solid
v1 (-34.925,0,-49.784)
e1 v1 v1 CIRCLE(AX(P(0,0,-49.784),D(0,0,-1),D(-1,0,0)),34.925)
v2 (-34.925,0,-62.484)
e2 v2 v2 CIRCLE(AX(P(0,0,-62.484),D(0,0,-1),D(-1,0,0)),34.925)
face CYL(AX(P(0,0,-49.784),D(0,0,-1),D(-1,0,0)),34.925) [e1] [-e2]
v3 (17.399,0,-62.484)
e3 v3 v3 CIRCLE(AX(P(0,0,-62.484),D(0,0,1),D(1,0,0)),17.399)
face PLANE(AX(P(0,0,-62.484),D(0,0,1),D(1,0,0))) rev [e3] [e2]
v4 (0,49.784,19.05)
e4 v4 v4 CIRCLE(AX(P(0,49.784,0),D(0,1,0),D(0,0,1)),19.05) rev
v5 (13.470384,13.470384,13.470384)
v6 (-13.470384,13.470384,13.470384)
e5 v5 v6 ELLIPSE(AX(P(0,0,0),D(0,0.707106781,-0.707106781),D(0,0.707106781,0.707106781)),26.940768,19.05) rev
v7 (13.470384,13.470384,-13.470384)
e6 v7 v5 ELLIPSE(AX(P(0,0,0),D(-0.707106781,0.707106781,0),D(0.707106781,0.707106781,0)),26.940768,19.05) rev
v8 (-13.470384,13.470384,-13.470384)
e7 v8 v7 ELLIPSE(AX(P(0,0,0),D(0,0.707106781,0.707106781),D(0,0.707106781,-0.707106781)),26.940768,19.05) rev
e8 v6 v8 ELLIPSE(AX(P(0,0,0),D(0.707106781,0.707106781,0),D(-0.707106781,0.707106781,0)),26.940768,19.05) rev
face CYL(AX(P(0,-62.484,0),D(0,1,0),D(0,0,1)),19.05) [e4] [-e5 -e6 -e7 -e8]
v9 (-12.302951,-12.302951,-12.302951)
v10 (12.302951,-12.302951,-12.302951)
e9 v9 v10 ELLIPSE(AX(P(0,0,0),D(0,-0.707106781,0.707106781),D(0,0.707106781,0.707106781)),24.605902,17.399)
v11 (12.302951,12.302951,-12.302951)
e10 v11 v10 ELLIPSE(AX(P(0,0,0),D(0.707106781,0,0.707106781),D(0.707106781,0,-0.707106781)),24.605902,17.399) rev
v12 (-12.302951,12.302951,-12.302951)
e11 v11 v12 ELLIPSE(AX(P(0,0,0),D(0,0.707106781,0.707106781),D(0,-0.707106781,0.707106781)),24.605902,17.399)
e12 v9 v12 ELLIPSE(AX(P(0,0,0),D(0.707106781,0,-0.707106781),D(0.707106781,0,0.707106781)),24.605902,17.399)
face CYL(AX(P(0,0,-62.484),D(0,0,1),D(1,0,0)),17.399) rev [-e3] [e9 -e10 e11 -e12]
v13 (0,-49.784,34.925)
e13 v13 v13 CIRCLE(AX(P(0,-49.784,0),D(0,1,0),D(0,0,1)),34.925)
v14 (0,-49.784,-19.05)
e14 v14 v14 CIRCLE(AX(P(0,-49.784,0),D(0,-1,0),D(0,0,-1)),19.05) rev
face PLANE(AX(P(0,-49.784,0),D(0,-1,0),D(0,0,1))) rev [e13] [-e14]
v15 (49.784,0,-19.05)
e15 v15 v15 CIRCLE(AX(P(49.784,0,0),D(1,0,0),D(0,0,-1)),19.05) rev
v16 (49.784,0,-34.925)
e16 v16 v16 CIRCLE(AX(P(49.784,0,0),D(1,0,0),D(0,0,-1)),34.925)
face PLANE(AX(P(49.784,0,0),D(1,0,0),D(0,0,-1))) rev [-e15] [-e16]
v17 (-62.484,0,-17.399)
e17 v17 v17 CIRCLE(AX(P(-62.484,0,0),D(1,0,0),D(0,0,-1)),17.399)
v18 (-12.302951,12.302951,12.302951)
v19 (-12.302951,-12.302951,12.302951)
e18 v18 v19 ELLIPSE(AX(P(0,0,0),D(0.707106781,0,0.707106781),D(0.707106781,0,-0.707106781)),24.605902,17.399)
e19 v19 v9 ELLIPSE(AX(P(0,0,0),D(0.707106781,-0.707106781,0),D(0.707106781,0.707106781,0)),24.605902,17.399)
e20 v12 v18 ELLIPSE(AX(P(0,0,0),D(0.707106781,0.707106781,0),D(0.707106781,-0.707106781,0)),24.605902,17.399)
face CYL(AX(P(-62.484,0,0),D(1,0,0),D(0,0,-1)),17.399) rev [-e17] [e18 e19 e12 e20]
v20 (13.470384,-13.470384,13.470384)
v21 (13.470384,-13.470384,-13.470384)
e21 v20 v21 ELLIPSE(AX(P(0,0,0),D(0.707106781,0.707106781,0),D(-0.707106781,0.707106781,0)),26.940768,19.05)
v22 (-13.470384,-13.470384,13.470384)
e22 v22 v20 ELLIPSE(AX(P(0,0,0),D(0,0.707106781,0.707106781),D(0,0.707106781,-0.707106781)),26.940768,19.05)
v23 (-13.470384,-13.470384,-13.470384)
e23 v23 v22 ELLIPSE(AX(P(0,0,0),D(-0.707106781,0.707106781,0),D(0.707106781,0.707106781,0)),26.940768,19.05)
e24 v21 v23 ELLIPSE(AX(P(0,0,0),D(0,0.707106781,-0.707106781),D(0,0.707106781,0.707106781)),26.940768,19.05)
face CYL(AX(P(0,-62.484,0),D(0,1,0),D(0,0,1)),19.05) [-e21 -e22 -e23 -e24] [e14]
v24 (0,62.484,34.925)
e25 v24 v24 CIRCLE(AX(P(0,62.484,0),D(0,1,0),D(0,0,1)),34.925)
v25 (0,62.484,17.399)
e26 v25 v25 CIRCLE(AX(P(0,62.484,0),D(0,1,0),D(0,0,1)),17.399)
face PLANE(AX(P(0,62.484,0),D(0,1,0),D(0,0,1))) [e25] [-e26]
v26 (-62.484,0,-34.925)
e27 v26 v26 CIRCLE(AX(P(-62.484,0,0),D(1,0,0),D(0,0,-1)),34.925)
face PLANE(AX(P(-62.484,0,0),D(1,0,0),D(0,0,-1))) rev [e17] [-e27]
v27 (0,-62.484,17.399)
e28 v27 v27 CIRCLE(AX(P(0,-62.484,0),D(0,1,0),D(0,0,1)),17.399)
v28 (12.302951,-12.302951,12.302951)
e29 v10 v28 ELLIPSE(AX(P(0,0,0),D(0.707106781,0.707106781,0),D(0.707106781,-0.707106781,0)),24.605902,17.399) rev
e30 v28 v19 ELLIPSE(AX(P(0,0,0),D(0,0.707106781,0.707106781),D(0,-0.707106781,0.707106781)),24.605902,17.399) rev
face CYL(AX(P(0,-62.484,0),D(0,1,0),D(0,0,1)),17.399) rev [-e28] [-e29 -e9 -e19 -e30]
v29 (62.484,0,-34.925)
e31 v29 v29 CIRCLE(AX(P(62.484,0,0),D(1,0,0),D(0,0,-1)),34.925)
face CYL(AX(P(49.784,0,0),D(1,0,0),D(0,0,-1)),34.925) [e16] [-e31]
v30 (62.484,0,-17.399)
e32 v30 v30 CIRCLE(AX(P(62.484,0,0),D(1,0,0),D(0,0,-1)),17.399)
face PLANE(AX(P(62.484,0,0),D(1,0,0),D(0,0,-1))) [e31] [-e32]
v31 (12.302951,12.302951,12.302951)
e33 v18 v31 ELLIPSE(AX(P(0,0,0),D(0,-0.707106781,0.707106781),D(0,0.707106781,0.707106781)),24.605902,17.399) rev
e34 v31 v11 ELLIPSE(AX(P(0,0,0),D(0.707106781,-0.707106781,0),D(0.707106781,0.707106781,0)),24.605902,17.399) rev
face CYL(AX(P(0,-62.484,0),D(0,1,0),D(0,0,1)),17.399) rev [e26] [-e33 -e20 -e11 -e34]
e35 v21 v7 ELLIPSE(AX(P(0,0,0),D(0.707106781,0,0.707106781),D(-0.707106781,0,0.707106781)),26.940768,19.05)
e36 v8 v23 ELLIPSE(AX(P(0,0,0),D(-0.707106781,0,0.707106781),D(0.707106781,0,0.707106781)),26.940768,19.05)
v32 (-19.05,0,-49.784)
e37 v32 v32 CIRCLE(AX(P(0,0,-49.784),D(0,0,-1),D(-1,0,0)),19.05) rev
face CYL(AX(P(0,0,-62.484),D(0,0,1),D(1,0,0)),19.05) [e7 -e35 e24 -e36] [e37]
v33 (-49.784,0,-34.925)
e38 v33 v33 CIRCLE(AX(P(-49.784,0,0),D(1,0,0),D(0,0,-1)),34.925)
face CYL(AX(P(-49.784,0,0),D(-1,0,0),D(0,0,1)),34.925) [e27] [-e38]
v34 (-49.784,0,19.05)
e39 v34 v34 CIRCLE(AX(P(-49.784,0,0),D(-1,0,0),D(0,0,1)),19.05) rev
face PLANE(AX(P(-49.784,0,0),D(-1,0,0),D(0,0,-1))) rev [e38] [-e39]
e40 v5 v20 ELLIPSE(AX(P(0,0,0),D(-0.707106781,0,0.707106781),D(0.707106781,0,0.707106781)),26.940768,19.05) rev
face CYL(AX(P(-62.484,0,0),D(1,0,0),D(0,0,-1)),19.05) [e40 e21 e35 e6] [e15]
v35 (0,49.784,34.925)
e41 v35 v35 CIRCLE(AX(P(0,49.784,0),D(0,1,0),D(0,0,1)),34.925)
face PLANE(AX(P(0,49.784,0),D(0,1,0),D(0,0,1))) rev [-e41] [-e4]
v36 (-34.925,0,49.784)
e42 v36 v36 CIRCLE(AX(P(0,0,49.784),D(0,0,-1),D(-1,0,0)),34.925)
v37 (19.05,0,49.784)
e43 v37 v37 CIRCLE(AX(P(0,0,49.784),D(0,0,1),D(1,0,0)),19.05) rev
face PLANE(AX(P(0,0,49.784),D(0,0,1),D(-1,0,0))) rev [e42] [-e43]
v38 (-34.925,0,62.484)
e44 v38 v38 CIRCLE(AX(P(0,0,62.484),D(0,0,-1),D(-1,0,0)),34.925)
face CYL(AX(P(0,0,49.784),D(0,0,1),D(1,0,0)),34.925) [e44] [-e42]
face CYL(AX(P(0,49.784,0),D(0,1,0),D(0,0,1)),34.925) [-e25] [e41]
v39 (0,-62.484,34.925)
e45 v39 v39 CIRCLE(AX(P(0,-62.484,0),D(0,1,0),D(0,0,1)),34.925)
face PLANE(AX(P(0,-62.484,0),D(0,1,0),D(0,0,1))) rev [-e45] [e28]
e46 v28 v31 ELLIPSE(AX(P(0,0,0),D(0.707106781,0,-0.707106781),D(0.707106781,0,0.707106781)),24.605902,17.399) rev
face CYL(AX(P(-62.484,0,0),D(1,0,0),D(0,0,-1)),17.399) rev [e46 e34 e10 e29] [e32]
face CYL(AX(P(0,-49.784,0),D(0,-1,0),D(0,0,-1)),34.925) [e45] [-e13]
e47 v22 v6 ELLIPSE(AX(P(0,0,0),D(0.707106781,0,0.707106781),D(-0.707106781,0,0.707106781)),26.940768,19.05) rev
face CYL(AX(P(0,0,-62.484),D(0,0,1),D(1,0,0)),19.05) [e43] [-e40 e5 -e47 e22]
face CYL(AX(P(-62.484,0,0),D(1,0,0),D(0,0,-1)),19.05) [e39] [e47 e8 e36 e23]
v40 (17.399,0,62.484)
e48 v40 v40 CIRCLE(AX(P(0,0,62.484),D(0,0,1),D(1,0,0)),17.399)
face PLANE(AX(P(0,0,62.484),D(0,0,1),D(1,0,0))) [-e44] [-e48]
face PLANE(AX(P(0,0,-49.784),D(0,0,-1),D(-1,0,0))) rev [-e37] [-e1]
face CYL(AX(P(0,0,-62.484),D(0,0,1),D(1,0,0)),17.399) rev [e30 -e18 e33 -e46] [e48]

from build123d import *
from build123d.topology import SkipClean

# Parameters (mm, degrees)
EXTRUDE1_DEPTH      = 62.484
EXTRUDE1_DEPTH_BACK = 62.484
SKETCH1_R           = 19.05
SKETCH1_R_2         = 17.399
EXTRUDE2_DEPTH      = 62.484
EXTRUDE2_DEPTH_BACK = 62.484
SKETCH2_R           = 19.05
SKETCH2_R_2         = 17.399
EXTRUDE3_DEPTH      = 62.484
EXTRUDE3_DEPTH_BACK = 62.484
SKETCH3_R           = 19.05
SKETCH3_R_2         = 17.399
EXTRUDE4_START      = -81.534000101
EXTRUDE4_OUTLINE_R  = 17.399
EXTRUDE4_DEPTH      = 38.100000201
SKETCH5_R           = 17.399
EXTRUDE5_DEPTH      = 154.053917211
SKETCH6_R           = 17.399
EXTRUDE6_DEPTH      = 154.053917211
SKETCH7_R           = 34.925
SKETCH7_R_2         = 17.399
EXTRUDE7_DEPTH      = 12.7
SKETCH8_R           = 34.925
SKETCH8_R_2         = 17.399
EXTRUDE8_DEPTH      = 12.7
SKETCH9_R           = 34.925
SKETCH9_R_2         = 17.399
EXTRUDE9_DEPTH      = 12.7


# Read off the part's stored shape, not the designer's step: Extrude4
with BuildPart() as part:
    # Sketch1 → Extrude1 (new, two sides: drawn at the far end of the back side and taken through both)
    with BuildSketch(Plane(origin=(0, 0, 0), x_dir=(1, 0, 0), z_dir=(0, 1, 0)).offset(-EXTRUDE1_DEPTH_BACK)):
        with Locations(Location((0, 0, 0), (0, 0, 270))):
            Circle(SKETCH1_R)
        with Locations(Location((0, 0, 0), (0, 0, 270))):
            Circle(SKETCH1_R_2, mode=Mode.SUBTRACT)
    extrude(amount=EXTRUDE1_DEPTH + EXTRUDE1_DEPTH_BACK)

    # Sketch2 → Extrude2 (add, two sides: drawn at the far end of the back side and taken through both)
    with BuildSketch(Plane.XY.offset(-EXTRUDE2_DEPTH_BACK)):
        Circle(SKETCH2_R)
        Circle(SKETCH2_R_2, mode=Mode.SUBTRACT)
    extrude(amount=EXTRUDE2_DEPTH + EXTRUDE2_DEPTH_BACK)

    # Sketch3 → Extrude3 (add, two sides: drawn at the far end of the back side and taken through both)
    with BuildSketch(Plane(origin=(0, 0, 0), x_dir=(0, 0, -1), z_dir=(1, 0, 0)).offset(-EXTRUDE3_DEPTH_BACK)):
        Circle(SKETCH3_R)
        Circle(SKETCH3_R_2, mode=Mode.SUBTRACT)
    extrude(amount=EXTRUDE3_DEPTH + EXTRUDE3_DEPTH_BACK)

    # Extrude4 outline → Extrude4 (cut)
    with BuildSketch(Plane(origin=(62.484, 0, 0), x_dir=(0, 0, -1), z_dir=(1, 0, 0)).offset(EXTRUDE4_START)):
        Circle(EXTRUDE4_OUTLINE_R)
    extrude(amount=EXTRUDE4_DEPTH, mode=Mode.SUBTRACT)

    # Sketch5 → Extrude5 (cut, through all)
    with SkipClean():  # the faces are left unmerged after this step: merging them gives an invalid solid
        with BuildSketch(Plane(origin=(0, 0, -62.484), x_dir=(-1, 0, 0), z_dir=(0, 0, -1))):
            with Locations(Location((0, 0, 0), (0, 0, 180))):
                Circle(SKETCH5_R)
        extrude(amount=-EXTRUDE5_DEPTH, mode=Mode.SUBTRACT)

    # Sketch6 → Extrude6 (cut, through all)
    with BuildSketch(Plane(origin=(0, 62.484, 0), x_dir=(1, 0, 0), z_dir=(0, 1, 0))):
        with Locations(Location((0, 0, 0), (0, 0, 270))):
            Circle(SKETCH6_R)
    extrude(amount=-EXTRUDE6_DEPTH, mode=Mode.SUBTRACT)

    # Sketch7 → Extrude7 (add)
    with BuildSketch(Plane(origin=(62.484, 0, 0), x_dir=(0, 0, -1), z_dir=(1, 0, 0))):
        Circle(SKETCH7_R)
        Circle(SKETCH7_R_2, mode=Mode.SUBTRACT)
    extrude7 = extrude(amount=-EXTRUDE7_DEPTH)

    # Mirror1: Extrude7 across plane
    add(extrude7.mirror(Plane(origin=(0, 0, 0), x_dir=(0, 0, 1), z_dir=(1, 0, 0))))

    # Sketch8 → Extrude8 (add)
    with BuildSketch(Plane(origin=(0, 0, -62.484), x_dir=(-1, 0, 0), z_dir=(0, 0, -1))):
        Circle(SKETCH8_R)
        with Locations(Location((0, 0, 0), (0, 0, 180))):
            Circle(SKETCH8_R_2, mode=Mode.SUBTRACT)
    extrude8 = extrude(amount=-EXTRUDE8_DEPTH)

    # Mirror2: Extrude8 across plane
    add(extrude8.mirror(Plane.XY))

    # Sketch9 → Extrude9 (add)
    with BuildSketch(Plane(origin=(0, 62.484, 0), x_dir=(1, 0, 0), z_dir=(0, 1, 0))):
        with Locations(Location((0, 0, 0), (0, 0, 270))):
            Circle(SKETCH9_R)
        with Locations(Location((0, 0, 0), (0, 0, 270))):
            Circle(SKETCH9_R_2, mode=Mode.SUBTRACT)
    extrude9 = extrude(amount=-EXTRUDE9_DEPTH)

    # Mirror3: Extrude9 across plane
    add(extrude9.mirror(Plane.ZX))


solid = part.part
